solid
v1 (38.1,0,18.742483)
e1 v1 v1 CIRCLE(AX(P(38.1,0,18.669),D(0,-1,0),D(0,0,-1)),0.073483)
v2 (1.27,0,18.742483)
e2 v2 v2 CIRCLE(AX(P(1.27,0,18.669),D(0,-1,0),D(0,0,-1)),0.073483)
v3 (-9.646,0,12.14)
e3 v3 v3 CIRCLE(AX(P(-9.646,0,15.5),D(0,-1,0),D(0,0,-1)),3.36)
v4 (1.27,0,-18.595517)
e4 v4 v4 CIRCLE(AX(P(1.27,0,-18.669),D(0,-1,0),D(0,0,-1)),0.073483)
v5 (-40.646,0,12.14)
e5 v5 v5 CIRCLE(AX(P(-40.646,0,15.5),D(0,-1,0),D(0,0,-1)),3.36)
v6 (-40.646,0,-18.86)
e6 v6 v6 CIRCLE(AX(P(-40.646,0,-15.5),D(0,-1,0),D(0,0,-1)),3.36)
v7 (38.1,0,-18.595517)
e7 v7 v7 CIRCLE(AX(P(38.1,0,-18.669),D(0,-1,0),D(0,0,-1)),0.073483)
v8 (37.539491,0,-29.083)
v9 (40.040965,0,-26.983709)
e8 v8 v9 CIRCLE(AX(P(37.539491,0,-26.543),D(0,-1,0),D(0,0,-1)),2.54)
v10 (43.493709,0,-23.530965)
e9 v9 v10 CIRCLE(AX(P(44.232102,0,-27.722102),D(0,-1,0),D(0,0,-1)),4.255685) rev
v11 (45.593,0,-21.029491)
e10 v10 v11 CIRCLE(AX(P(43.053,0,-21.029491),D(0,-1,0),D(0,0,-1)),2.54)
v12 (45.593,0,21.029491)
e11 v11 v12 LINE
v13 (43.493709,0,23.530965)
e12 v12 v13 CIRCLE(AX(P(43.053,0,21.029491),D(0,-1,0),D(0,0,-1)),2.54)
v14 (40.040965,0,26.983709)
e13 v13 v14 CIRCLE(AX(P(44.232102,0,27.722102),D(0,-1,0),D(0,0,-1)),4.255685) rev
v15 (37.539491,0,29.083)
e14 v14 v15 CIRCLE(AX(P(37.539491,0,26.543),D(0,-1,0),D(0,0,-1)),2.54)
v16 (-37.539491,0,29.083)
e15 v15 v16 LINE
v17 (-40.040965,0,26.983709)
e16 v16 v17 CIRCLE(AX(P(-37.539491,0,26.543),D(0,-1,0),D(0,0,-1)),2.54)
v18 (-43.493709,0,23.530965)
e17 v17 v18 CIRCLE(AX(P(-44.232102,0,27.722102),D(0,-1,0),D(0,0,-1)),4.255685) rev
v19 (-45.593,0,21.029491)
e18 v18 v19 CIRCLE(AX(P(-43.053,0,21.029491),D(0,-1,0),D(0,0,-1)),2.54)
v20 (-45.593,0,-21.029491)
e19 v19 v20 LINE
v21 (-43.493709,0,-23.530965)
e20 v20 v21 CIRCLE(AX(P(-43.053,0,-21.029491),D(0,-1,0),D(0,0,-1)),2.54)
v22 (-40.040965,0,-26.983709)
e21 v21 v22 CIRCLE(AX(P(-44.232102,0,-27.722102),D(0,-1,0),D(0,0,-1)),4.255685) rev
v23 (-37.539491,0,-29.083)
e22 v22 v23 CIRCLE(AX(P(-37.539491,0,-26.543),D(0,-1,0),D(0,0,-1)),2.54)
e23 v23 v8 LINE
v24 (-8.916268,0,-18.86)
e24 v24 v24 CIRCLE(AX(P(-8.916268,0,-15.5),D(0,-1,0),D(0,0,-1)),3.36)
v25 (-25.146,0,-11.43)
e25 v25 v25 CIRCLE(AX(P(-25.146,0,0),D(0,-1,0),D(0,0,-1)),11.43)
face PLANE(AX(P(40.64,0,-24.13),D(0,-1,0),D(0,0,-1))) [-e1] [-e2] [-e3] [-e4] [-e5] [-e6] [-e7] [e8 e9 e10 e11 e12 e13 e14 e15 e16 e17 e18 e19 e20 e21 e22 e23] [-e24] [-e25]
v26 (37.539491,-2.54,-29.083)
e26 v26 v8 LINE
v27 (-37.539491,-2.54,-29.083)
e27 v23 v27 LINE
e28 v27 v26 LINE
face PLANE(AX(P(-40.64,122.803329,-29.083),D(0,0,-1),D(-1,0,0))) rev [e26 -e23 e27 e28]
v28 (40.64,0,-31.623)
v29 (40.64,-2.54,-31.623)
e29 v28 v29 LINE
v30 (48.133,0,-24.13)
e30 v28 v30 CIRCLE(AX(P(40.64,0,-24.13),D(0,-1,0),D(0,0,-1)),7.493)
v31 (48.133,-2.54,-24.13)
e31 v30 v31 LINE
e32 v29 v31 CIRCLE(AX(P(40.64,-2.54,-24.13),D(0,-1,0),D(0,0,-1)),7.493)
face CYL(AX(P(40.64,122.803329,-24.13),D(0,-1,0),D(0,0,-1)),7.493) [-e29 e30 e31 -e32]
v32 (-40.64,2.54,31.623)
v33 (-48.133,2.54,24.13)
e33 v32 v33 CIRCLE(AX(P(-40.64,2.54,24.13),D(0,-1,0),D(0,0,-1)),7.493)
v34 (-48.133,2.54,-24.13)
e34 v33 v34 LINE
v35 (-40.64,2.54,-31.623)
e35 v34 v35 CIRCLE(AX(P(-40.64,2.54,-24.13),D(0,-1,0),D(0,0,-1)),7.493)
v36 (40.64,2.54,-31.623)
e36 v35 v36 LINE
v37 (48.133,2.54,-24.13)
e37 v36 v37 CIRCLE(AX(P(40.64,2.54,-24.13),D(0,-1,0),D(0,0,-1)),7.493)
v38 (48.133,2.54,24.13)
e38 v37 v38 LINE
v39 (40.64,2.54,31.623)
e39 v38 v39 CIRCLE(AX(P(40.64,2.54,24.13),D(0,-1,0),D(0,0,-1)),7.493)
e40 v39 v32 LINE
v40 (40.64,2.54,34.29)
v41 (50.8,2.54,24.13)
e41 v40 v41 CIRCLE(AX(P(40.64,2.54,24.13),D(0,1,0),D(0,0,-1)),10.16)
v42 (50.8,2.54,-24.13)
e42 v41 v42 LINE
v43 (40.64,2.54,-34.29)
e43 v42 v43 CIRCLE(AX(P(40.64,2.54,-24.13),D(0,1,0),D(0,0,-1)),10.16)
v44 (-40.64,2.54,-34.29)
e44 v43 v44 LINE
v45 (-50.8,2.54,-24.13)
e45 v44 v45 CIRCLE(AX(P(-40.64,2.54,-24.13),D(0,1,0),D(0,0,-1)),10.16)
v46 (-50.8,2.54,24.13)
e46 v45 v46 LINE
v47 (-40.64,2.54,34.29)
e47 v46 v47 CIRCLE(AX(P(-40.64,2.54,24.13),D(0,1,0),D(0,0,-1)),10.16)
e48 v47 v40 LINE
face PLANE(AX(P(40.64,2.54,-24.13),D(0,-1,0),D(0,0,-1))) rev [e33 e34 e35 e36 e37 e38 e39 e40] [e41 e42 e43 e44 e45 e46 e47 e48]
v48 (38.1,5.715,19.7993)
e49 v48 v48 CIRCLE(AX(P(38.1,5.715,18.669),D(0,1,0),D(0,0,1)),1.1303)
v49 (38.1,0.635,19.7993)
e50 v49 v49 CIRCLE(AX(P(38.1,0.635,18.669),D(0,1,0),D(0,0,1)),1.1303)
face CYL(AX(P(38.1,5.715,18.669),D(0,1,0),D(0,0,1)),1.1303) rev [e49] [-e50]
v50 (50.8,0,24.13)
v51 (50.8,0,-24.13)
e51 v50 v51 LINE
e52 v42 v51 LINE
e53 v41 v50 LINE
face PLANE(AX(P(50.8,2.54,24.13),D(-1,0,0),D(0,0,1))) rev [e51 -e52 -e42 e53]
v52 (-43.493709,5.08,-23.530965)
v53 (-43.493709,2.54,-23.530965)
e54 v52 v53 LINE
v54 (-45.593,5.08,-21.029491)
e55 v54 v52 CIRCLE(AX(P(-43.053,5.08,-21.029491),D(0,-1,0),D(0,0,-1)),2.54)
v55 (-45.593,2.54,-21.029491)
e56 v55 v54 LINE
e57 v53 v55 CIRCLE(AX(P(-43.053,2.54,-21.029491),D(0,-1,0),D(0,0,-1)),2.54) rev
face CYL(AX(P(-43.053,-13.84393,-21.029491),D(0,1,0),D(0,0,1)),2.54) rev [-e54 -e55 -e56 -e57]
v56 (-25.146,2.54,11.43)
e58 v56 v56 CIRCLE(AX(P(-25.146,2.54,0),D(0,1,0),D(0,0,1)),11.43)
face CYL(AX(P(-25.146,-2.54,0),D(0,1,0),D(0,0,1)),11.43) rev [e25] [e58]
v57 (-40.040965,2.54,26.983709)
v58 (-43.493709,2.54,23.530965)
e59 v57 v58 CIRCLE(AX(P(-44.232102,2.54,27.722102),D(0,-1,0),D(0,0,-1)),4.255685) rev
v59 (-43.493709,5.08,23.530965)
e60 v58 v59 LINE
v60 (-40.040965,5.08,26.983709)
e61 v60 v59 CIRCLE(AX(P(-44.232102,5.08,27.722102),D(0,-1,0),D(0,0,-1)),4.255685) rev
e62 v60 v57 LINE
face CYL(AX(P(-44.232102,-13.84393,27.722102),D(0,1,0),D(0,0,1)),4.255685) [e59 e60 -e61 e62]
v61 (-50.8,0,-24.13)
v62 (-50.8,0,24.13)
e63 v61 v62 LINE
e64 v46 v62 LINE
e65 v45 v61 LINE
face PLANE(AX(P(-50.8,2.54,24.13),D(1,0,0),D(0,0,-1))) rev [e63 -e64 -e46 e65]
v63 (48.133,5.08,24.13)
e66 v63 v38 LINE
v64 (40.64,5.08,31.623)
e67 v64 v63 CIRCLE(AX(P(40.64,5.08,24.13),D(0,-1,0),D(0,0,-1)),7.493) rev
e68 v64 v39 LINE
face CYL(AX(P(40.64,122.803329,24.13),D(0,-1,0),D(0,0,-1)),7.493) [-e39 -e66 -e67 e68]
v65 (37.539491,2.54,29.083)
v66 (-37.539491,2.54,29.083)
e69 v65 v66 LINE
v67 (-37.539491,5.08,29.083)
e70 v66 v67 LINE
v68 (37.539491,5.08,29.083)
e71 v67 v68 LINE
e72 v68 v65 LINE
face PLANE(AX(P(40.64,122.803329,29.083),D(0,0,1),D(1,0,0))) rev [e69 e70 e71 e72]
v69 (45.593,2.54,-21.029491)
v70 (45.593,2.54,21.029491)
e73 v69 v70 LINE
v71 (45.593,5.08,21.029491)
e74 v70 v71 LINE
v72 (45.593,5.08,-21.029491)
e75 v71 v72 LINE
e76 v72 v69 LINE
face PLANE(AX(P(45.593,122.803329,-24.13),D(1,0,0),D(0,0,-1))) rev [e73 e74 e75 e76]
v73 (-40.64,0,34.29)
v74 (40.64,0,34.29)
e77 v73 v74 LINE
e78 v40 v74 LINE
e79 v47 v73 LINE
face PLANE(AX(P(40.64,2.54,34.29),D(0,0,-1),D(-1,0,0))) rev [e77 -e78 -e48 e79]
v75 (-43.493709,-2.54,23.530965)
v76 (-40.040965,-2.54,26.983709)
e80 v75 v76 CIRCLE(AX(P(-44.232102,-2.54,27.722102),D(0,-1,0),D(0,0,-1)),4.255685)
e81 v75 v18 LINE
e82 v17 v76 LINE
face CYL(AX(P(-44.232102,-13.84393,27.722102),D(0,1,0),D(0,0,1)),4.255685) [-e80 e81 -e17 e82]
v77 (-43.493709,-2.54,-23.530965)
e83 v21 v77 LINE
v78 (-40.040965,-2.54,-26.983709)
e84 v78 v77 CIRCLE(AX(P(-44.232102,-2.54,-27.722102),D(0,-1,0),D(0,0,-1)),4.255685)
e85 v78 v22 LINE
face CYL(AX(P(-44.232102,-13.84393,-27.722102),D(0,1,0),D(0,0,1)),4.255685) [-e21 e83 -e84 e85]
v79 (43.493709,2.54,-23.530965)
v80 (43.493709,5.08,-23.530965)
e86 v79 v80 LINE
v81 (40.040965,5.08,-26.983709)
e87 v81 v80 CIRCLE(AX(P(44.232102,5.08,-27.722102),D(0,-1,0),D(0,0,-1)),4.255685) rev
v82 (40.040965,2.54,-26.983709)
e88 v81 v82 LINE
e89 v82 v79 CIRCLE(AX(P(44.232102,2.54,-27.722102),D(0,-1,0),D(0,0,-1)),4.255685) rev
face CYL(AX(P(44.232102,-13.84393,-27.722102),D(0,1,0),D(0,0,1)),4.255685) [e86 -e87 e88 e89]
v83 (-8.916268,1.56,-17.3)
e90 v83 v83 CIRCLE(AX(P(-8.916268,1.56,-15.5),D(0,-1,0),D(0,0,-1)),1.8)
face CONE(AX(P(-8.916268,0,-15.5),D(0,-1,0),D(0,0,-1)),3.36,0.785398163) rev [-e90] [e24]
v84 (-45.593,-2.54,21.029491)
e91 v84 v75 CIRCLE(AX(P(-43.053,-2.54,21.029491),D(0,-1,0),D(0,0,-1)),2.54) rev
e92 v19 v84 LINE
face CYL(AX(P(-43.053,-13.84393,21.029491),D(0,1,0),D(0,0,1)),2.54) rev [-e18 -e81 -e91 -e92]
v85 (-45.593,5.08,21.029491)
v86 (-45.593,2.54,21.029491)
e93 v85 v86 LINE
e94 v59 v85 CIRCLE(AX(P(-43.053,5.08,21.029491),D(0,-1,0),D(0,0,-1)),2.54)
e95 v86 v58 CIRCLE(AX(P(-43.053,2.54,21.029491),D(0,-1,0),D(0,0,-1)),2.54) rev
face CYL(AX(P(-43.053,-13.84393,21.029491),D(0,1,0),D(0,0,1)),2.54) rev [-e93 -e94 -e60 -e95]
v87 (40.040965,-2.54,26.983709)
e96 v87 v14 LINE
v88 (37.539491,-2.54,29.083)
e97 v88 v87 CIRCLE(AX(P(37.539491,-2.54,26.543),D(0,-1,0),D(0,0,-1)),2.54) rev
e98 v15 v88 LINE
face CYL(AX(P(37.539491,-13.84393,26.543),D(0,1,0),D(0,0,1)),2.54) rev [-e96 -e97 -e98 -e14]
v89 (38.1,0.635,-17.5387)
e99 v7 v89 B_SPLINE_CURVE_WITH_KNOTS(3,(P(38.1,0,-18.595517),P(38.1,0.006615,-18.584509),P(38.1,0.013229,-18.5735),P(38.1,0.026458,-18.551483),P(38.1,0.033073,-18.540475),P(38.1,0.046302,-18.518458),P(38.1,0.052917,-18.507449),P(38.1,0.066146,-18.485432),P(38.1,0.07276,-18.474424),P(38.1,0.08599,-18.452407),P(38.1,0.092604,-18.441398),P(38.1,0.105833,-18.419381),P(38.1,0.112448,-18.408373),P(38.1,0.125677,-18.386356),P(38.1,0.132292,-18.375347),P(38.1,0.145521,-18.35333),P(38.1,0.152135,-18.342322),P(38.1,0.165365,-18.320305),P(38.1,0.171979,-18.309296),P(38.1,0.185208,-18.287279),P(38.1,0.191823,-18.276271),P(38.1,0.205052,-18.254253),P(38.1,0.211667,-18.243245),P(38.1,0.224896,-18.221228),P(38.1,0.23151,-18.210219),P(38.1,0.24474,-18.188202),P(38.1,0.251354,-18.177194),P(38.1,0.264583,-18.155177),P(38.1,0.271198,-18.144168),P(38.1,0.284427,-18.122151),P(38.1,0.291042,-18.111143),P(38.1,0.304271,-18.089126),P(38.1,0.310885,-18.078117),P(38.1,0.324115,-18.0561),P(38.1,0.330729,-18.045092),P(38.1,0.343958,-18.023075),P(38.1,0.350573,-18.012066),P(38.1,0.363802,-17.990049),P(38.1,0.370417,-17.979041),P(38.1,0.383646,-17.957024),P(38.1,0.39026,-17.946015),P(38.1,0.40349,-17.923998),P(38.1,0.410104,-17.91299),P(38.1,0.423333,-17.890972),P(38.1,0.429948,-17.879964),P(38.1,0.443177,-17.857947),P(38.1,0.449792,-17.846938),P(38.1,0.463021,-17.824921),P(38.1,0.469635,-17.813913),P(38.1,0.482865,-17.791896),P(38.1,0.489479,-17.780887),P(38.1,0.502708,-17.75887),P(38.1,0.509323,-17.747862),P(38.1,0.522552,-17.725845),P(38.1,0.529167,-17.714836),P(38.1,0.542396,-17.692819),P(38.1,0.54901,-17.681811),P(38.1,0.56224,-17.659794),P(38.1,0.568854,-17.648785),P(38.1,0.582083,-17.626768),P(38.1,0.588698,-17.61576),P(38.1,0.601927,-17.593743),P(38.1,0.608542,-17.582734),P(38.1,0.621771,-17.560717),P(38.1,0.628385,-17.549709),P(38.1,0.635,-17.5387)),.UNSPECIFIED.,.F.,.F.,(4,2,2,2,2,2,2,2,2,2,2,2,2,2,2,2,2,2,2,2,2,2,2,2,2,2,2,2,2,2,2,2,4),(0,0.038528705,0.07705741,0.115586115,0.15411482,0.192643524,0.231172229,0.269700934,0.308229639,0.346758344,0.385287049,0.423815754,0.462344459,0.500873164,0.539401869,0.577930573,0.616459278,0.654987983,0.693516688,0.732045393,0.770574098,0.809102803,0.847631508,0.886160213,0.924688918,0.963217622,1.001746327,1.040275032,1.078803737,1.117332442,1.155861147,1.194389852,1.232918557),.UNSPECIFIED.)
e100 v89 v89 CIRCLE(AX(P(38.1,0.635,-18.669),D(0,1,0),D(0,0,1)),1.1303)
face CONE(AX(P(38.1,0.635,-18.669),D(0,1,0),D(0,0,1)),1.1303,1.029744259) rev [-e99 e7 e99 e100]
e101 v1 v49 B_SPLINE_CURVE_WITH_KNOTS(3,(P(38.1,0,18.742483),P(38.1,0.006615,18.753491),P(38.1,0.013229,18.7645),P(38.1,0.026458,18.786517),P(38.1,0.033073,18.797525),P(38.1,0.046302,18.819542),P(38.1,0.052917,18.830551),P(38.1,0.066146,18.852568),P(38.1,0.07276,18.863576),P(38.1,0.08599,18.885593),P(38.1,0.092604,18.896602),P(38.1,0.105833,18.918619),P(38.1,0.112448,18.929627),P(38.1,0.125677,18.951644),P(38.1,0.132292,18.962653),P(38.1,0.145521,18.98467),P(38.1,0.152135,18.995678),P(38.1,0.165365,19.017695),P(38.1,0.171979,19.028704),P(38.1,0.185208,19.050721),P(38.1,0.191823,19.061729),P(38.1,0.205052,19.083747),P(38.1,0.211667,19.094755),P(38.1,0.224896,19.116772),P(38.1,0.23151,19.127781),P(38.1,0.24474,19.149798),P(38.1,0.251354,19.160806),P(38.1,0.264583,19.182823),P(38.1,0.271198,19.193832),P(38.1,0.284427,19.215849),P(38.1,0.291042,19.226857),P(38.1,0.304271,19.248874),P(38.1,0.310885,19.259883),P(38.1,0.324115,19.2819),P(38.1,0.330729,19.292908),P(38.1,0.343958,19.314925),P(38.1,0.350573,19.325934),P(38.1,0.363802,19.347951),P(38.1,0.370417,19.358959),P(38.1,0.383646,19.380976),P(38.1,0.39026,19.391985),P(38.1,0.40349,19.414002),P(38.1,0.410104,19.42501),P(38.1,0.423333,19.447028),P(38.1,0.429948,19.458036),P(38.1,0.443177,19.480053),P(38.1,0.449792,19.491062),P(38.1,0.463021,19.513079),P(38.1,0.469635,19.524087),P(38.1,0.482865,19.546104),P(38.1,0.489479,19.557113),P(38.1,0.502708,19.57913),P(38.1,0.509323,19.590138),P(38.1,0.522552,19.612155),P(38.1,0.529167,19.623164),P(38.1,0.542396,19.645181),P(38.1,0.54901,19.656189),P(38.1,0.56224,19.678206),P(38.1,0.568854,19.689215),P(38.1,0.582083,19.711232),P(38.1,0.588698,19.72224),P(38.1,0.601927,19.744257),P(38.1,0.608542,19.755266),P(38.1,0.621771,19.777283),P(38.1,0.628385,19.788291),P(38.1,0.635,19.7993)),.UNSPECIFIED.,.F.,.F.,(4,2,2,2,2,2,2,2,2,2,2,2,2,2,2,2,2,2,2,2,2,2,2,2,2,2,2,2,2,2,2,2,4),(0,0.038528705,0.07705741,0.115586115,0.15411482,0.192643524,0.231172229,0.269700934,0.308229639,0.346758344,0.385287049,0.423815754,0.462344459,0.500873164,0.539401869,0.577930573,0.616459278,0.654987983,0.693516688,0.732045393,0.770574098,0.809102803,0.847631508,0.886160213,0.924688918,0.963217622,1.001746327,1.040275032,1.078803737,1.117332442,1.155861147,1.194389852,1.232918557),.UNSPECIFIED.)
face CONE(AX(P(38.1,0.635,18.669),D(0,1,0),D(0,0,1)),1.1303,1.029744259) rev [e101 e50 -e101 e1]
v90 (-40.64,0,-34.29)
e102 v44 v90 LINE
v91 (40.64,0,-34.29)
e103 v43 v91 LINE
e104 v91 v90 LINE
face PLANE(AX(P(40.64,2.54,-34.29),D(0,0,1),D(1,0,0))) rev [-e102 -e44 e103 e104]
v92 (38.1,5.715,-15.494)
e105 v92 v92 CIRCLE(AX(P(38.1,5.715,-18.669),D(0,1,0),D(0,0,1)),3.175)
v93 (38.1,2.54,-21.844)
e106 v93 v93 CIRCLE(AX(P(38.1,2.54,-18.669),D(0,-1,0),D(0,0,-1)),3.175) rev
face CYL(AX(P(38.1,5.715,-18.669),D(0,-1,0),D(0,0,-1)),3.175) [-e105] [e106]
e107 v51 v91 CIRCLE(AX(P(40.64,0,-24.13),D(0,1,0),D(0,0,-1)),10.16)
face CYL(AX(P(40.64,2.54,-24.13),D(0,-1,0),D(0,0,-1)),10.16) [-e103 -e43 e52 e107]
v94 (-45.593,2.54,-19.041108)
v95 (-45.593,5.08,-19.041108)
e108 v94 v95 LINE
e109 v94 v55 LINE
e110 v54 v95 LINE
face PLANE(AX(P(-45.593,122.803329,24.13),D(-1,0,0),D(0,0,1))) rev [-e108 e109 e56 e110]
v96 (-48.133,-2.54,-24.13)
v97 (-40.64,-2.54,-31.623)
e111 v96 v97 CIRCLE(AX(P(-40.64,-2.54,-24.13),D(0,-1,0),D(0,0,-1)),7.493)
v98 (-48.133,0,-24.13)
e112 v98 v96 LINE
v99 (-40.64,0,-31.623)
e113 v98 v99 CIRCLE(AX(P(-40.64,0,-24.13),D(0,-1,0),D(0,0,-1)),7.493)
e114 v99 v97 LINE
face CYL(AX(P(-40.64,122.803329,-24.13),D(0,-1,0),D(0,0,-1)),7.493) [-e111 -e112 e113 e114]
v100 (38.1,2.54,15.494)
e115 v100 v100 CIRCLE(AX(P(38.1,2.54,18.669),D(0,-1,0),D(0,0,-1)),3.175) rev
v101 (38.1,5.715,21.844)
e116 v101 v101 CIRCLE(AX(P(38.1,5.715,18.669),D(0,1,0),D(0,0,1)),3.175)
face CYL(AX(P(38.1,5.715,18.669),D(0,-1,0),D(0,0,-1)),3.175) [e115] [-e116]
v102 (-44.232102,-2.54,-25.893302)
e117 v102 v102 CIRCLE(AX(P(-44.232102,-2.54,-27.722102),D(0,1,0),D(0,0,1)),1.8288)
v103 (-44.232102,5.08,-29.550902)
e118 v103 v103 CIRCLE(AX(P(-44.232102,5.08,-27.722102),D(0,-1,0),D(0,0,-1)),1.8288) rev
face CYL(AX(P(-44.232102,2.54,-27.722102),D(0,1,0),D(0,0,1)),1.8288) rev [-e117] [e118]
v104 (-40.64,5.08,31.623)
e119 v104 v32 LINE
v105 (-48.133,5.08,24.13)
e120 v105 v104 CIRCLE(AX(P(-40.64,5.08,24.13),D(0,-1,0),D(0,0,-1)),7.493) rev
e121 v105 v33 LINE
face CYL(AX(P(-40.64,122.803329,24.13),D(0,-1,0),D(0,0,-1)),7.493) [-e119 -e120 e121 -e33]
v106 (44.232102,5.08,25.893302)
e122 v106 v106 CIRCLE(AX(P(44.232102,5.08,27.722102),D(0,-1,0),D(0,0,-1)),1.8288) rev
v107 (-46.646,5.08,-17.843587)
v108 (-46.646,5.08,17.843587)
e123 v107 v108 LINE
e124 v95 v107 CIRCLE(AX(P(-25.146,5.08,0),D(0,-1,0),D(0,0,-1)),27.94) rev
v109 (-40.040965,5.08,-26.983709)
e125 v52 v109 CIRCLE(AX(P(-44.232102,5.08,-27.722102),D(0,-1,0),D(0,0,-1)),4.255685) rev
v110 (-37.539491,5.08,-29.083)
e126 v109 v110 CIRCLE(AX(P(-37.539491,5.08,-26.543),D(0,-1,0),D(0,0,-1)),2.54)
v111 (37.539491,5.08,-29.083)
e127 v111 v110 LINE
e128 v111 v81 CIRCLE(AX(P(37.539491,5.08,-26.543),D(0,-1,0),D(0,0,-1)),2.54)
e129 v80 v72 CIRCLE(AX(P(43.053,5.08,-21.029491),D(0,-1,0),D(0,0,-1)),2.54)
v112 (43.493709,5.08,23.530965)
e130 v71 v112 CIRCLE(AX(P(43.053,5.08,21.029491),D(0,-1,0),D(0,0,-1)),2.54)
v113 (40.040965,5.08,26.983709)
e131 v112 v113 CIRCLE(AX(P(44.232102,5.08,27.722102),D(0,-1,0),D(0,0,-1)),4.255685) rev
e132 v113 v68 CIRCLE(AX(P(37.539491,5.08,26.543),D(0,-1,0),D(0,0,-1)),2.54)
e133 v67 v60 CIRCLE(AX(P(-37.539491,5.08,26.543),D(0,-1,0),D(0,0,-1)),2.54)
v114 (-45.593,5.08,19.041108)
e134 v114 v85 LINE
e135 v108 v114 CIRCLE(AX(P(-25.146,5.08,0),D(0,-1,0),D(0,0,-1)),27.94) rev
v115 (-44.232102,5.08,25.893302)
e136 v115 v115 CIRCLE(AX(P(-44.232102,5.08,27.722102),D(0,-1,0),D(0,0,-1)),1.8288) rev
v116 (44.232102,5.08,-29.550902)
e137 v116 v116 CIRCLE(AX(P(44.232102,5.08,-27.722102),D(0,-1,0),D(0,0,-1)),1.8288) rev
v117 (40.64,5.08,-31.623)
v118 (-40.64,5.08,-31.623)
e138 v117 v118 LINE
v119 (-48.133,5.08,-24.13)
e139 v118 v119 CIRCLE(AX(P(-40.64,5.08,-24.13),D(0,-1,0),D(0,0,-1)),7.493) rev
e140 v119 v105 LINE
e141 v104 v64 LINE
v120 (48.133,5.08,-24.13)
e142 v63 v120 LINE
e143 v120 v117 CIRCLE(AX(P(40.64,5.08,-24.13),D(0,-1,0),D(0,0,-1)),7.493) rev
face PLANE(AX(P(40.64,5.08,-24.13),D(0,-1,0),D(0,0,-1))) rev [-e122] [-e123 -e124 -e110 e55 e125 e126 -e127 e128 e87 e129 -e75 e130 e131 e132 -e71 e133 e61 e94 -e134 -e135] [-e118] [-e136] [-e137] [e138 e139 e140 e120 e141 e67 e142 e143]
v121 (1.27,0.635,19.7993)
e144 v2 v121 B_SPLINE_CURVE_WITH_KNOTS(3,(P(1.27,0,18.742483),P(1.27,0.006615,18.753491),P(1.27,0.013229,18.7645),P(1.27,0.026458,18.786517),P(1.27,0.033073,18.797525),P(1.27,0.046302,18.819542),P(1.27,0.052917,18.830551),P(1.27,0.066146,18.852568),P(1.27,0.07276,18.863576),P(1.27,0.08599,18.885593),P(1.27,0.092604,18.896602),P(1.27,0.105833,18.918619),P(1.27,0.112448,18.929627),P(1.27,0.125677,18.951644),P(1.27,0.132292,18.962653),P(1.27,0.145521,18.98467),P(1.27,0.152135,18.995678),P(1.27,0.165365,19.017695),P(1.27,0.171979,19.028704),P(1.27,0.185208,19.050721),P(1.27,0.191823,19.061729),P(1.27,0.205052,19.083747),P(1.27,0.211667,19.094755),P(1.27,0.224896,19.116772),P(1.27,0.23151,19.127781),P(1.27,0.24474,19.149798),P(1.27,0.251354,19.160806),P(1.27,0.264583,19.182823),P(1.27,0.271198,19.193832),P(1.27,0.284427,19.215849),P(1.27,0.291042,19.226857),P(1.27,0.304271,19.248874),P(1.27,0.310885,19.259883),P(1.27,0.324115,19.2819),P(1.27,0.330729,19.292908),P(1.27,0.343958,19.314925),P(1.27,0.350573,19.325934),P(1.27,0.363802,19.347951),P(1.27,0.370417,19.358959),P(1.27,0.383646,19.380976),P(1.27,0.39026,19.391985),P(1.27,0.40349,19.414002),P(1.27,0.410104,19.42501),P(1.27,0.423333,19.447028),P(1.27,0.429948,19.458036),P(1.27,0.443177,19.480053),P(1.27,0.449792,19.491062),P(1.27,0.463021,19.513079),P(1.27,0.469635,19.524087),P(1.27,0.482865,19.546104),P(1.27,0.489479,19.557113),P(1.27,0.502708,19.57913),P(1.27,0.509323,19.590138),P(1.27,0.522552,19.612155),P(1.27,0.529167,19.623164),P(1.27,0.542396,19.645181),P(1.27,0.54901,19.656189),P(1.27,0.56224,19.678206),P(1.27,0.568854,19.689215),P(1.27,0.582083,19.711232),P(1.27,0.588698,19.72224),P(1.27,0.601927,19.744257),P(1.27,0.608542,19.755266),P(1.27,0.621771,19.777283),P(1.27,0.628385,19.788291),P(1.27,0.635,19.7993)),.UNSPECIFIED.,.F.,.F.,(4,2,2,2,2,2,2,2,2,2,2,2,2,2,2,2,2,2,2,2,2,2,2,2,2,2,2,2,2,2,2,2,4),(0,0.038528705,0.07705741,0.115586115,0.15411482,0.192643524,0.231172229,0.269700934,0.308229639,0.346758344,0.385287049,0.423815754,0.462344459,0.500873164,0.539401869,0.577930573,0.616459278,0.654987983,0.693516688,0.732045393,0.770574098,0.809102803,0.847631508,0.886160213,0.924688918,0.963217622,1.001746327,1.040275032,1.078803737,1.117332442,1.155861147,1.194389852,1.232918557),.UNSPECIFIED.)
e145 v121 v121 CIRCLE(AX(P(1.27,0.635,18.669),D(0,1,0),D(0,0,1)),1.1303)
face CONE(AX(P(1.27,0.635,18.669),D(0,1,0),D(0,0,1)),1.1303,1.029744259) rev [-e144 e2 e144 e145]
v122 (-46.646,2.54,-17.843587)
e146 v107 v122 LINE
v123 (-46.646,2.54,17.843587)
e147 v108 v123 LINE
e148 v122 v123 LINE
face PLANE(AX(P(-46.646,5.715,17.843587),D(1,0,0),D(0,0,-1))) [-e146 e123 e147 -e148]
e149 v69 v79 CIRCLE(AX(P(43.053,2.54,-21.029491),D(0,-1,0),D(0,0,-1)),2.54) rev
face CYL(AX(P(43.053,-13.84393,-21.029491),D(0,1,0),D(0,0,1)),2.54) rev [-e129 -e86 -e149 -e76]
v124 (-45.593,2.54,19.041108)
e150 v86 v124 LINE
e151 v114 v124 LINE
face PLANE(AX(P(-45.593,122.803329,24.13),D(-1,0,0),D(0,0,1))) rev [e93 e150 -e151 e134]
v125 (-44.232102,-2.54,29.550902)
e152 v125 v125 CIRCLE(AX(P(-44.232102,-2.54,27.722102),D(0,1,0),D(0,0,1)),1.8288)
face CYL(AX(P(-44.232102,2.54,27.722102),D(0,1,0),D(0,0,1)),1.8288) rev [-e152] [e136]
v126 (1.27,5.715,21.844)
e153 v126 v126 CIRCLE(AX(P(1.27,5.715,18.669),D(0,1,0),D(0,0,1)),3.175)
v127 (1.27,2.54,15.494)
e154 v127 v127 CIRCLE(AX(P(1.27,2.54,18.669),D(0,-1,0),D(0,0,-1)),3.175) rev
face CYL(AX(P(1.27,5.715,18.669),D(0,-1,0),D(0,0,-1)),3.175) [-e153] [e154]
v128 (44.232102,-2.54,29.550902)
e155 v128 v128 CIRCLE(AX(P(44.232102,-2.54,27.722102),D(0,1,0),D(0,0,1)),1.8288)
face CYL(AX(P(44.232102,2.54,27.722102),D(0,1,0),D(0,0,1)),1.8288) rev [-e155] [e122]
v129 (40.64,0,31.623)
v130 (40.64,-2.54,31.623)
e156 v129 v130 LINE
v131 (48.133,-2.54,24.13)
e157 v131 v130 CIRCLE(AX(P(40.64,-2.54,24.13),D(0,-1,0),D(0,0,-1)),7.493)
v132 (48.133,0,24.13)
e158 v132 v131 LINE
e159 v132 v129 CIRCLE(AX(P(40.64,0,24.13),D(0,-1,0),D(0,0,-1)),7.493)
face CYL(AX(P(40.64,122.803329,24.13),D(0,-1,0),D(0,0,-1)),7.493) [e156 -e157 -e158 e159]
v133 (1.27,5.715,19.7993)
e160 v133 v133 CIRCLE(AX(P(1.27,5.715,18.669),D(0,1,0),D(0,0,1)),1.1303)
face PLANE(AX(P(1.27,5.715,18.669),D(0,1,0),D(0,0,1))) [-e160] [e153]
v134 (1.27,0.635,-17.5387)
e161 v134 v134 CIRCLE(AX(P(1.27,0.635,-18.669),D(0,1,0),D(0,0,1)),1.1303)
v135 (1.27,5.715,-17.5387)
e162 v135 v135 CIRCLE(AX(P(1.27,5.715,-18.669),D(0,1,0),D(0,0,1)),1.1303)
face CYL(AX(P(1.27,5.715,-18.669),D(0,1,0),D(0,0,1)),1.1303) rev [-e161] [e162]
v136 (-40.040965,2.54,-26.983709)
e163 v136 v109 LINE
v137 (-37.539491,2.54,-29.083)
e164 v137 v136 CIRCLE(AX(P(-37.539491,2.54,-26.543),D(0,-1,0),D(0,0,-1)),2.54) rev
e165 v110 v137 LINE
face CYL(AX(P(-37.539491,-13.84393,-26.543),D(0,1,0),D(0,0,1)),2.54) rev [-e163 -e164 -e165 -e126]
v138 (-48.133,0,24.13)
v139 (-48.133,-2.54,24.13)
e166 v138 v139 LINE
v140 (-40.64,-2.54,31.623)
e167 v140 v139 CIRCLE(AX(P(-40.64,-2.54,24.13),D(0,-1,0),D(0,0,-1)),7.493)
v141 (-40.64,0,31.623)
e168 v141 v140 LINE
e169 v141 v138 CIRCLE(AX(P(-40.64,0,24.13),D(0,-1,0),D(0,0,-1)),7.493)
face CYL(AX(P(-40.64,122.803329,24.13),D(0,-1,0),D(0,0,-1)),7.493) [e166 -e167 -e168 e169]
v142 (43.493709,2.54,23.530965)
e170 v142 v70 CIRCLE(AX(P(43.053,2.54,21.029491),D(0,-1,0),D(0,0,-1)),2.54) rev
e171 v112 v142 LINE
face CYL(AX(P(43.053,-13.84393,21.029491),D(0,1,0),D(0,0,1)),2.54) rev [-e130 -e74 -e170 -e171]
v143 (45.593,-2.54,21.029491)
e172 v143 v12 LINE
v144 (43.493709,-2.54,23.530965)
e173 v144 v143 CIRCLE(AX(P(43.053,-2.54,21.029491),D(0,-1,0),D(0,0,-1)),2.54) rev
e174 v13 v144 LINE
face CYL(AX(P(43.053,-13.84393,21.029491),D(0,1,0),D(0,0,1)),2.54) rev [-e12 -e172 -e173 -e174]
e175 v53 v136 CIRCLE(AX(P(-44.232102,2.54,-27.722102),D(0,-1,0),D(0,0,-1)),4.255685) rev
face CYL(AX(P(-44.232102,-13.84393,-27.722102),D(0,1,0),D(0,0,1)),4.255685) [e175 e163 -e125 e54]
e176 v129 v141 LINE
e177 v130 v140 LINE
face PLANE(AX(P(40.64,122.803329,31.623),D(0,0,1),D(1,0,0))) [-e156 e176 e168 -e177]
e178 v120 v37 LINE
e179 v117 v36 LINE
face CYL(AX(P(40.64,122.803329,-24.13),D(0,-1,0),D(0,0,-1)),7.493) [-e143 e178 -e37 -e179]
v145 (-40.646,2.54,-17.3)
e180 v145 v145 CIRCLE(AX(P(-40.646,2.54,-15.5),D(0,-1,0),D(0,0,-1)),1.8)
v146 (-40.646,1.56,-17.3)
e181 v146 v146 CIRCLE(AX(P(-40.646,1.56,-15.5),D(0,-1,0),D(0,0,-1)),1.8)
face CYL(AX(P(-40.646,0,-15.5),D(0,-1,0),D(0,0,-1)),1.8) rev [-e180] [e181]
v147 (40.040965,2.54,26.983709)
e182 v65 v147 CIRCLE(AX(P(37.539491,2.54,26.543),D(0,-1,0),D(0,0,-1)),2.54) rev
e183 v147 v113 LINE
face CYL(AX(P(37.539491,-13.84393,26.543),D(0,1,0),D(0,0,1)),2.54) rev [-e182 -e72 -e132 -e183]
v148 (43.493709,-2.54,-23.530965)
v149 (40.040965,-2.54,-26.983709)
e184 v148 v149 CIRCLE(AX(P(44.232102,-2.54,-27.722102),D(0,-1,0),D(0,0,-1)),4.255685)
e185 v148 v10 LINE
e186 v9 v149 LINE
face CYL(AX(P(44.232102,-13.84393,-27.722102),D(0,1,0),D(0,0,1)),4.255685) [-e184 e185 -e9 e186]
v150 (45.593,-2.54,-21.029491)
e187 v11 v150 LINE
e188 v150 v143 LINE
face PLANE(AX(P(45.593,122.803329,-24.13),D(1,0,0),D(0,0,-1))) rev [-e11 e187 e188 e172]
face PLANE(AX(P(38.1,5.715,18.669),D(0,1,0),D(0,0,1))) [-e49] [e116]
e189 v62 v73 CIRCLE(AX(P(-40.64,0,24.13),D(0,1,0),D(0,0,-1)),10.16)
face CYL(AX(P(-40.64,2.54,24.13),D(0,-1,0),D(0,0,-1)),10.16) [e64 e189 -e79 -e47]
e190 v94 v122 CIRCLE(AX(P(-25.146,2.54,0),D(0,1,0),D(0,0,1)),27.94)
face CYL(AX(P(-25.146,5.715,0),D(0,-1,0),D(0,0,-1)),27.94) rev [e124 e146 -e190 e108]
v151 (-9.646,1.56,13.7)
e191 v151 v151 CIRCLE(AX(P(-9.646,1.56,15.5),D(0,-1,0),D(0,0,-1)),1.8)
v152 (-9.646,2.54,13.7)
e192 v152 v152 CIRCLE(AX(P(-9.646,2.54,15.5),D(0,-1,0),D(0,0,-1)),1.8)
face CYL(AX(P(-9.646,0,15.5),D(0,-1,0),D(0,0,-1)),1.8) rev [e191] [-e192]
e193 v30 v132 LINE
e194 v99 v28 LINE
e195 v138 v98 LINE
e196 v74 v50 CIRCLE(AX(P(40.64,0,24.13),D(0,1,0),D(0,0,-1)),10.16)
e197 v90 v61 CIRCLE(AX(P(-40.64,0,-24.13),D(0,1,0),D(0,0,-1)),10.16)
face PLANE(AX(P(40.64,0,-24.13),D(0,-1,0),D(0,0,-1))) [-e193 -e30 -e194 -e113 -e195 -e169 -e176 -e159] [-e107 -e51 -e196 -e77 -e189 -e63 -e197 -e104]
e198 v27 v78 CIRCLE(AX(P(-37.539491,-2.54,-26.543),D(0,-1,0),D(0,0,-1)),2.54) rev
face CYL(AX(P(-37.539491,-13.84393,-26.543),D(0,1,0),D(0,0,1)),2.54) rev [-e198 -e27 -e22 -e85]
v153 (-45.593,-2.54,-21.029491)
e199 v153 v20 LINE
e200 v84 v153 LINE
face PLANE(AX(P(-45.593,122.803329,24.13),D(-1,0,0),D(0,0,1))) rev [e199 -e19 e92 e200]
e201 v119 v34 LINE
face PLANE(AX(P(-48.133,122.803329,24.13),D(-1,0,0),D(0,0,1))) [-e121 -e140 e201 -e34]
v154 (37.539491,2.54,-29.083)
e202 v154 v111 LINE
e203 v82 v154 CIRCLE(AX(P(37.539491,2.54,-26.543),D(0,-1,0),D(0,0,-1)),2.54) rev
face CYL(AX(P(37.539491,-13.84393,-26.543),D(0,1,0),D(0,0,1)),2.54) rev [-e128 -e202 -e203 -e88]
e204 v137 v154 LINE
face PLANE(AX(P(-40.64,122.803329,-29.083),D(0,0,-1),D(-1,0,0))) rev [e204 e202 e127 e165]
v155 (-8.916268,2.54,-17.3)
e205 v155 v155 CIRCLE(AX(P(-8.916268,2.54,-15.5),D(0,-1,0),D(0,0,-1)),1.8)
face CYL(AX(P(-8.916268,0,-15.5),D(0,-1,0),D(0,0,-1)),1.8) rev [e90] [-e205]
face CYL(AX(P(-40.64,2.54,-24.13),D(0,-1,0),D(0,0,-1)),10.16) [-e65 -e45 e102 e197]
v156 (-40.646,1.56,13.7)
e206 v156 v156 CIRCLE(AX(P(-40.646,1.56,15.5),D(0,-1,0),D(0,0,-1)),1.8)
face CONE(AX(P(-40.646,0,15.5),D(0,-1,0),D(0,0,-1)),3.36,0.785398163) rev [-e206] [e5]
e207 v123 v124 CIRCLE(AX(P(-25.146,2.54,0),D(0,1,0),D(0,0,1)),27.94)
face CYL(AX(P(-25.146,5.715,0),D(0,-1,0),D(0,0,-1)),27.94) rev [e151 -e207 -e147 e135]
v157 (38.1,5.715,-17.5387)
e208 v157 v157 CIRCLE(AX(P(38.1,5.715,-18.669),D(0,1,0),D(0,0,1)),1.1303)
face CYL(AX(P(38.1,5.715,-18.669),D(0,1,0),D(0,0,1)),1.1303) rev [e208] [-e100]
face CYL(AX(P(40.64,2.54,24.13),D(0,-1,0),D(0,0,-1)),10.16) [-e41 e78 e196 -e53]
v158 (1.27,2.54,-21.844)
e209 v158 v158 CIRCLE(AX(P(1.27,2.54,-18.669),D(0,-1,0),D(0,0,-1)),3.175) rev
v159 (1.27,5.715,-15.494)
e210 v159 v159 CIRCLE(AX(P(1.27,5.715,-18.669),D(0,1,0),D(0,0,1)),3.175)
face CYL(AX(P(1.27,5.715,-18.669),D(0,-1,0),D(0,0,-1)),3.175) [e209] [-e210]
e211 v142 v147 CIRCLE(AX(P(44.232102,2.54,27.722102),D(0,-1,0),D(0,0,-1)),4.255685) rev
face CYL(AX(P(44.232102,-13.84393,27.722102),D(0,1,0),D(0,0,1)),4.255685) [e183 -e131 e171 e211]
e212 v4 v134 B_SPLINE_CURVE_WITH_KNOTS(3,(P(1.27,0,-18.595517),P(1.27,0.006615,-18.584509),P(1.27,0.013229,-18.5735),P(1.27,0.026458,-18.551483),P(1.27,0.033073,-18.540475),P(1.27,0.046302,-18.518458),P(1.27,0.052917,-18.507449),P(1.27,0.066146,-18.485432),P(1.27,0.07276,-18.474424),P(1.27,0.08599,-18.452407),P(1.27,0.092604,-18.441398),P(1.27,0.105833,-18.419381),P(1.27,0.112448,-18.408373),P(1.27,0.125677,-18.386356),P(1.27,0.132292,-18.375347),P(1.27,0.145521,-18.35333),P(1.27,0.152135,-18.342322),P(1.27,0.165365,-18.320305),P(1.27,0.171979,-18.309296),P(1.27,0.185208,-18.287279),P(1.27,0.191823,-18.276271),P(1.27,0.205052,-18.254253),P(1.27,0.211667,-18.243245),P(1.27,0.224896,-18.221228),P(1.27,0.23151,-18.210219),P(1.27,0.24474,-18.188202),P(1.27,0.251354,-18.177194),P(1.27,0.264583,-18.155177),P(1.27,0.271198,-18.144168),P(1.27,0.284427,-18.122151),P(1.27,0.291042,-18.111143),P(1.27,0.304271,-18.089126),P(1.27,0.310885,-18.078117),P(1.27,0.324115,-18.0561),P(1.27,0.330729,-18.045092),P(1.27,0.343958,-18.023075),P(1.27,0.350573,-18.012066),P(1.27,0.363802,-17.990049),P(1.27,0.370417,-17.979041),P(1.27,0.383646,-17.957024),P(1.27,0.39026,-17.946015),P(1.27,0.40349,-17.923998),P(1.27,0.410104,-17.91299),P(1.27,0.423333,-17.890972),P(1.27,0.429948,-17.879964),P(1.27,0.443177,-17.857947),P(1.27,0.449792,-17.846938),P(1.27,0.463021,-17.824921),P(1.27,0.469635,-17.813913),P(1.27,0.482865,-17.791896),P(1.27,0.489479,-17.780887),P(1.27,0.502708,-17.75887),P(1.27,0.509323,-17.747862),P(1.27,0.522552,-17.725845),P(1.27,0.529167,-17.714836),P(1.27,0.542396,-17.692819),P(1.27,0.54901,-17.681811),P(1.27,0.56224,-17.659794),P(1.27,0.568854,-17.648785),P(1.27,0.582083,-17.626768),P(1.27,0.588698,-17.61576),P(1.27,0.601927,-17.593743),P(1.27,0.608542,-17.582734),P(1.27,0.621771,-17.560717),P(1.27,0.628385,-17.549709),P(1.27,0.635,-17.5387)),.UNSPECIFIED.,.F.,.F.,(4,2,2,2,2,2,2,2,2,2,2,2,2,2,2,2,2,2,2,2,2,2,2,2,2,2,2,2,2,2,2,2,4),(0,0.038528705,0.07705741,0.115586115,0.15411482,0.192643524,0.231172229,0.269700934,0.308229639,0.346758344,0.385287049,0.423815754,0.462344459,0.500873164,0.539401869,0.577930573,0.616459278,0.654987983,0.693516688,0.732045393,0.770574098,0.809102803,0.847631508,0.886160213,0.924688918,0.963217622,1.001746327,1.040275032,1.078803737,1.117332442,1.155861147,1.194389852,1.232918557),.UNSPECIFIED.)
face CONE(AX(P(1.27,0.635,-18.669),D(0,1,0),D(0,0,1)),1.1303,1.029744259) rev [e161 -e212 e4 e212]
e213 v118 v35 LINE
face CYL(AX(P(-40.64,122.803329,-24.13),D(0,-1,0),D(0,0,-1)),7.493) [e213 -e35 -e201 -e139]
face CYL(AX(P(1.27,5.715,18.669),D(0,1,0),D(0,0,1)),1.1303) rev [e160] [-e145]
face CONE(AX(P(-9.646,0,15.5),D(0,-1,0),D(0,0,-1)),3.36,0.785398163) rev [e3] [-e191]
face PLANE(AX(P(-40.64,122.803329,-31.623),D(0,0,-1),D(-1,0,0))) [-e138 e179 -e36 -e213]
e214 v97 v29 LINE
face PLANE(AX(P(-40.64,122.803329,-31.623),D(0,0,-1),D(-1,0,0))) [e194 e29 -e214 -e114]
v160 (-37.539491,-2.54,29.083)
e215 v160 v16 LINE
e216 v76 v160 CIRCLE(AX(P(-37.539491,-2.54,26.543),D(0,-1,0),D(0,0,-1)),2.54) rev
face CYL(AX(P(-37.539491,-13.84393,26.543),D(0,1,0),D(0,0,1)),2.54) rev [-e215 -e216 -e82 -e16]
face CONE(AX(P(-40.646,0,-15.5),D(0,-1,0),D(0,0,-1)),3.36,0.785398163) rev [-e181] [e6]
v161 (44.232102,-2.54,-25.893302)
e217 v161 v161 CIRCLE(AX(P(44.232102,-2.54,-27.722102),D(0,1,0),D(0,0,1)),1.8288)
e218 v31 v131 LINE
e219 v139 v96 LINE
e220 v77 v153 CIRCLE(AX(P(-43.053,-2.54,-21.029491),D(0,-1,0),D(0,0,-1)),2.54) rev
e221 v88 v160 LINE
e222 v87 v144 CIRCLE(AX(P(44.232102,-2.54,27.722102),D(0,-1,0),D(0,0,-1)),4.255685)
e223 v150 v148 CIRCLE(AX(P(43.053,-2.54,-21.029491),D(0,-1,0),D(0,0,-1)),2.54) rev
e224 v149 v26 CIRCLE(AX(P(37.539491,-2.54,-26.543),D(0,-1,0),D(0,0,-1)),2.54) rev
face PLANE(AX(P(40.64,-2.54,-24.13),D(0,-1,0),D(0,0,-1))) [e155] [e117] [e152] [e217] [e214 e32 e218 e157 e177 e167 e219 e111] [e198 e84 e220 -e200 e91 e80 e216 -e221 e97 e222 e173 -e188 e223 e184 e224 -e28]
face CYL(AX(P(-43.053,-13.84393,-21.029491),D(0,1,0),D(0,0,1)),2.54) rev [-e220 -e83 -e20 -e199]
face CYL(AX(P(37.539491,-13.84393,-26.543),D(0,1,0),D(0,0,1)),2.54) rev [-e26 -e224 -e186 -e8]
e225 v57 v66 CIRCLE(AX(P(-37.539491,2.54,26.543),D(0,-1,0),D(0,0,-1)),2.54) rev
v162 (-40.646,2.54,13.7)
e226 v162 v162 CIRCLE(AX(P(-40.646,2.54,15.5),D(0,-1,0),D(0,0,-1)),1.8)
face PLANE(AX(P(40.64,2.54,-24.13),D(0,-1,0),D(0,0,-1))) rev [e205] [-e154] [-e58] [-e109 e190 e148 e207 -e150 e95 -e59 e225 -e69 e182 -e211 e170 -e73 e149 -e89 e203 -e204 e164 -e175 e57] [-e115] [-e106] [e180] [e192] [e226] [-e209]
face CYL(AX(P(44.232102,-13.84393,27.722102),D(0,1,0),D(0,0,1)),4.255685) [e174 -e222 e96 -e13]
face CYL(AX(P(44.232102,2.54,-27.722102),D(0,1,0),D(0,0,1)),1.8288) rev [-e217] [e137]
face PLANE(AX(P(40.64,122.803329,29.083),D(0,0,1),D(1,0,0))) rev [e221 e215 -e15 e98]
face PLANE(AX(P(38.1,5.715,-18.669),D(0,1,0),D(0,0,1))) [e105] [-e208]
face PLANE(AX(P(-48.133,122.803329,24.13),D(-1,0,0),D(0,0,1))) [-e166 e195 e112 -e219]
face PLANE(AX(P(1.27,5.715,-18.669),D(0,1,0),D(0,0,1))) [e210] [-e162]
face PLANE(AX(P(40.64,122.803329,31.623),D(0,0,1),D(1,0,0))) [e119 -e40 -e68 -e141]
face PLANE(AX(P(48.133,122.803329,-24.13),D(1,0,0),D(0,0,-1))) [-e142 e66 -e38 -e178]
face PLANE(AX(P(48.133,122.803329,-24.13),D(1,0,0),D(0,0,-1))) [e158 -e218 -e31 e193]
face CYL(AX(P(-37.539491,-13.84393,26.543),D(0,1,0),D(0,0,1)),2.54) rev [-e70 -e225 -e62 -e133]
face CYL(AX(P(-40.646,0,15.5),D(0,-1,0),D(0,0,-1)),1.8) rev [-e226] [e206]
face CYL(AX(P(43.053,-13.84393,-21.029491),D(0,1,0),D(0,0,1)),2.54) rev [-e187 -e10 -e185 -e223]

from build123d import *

# Parameters (mm, degrees)
BOSS_EXTRUDE1_DEPTH           = 2.54
BOSS_EXTRUDE2_DEPTH           = 2.54
BOSS_EXTRUDE2_DEPTH_BACK      = 5.08
HOLE1_OUTLINE_R               = 11.43
HOLE1_DEPTH                   = 2.54
CSK_FOR_M3_SFHCS1_D           = 3.6
CSK_FOR_M3_SFHCS1_CSINK_D     = 6.72
CSK_FOR_M3_SFHCS1_CSINK_ANGLE = 90
SKETCH9_W                     = 1.8288
SKETCH9_H                     = 5.08
F_6_CLEARANCE_HOLE_AT_2_COUNT = 2
F_6_CLEARANCE_HOLE_AT_2_PITCH = 55.444204897
F_6_CLEARANCE_HOLE_AT_3_COUNT = 2
F_6_CLEARANCE_HOLE_AT_3_PITCH = 104.402947299
F_6_CLEARANCE_HOLE_AT_4_COUNT = 2
F_6_CLEARANCE_HOLE_AT_4_PITCH = 88.464204897
BOSS_EXTRUDE4_START           = -5.08
SKETCH10_R                    = 1.8288
BOSS_EXTRUDE4_DEPTH           = 7.62
FILLET4_R                     = 2.54
SKETCH11_R                    = 3.175
BOSS_EXTRUDE5_DEPTH           = 3.175
TAP_DRILL_FOR_4_40_TAP1_D     = 2.2606
TAP_DRILL_FOR_4_40_TAP1_DEPTH = 5.08
TAP_DRILL_FOR_4_40_TAP1_TIP   = 0.679152758
SKETCH14_R                    = 1.8288
CUT_EXTRUDE1_DEPTH            = 62.843262568
CUT_EXTRUDE2_DEPTH            = 62.500004065


# Read off the part's stored shape, not the designer's step: Hole1
with BuildPart() as part:
    # Sketch1 → Boss-Extrude1 (new body)
    with BuildSketch(Plane(origin=(0, 0, 0), x_dir=(1, 0, 0), z_dir=(0, 1, 0))):
        with BuildLine():
            Line((40.64, -34.29), (-40.64, -34.29))
            ThreePointArc((-40.64, -34.29), (-47.824204897, -31.314204897), (-50.8, -24.13))
            Line((-50.8, -24.13), (-50.8, 24.13))
            ThreePointArc((-50.8, 24.13), (-47.824204897, 31.314204897), (-40.64, 34.29))
            Line((-40.64, 34.29), (40.64, 34.29))
            ThreePointArc((40.64, 34.29), (47.824204897, 31.314204897), (50.8, 24.13))
            Line((50.8, 24.13), (50.8, -24.13))
            ThreePointArc((50.8, -24.13), (47.824204897, -31.314204897), (40.64, -34.29))
        make_face()
    extrude(amount=BOSS_EXTRUDE1_DEPTH)

    # Sketch2 → Boss-Extrude2 (add, two sides: drawn at the far end of the back side and taken through both)
    with BuildSketch(Plane.XZ.offset(-BOSS_EXTRUDE2_DEPTH_BACK)):
        with BuildLine():
            Line((48.133, -24.13), (48.133, 24.13))
            ThreePointArc((48.133, 24.13), (45.938351111, 29.428351111), (40.64, 31.623))
            Line((40.64, 31.623), (-40.64, 31.623))
            ThreePointArc((-40.64, 31.623), (-45.938351111, 29.428351111), (-48.133, 24.13))
            Line((-48.133, 24.13), (-48.133, -24.13))
            ThreePointArc((-48.133, -24.13), (-45.938351111, -29.428351111), (-40.64, -31.623))
            Line((-40.64, -31.623), (40.64, -31.623))
            ThreePointArc((40.64, -31.623), (45.938351111, -29.428351111), (48.133, -24.13))
        make_face()
        with BuildLine():
            Line((45.593, -24.13), (45.593, 24.13))
            ThreePointArc((45.593, 24.13), (44.142299887, 27.632299887), (40.64, 29.083))
            Line((40.64, 29.083), (-40.64, 29.083))
            ThreePointArc((-40.64, 29.083), (-44.142299887, 27.632299887), (-45.593, 24.13))
            Line((-45.593, 24.13), (-45.593, -24.13))
            ThreePointArc((-45.593, -24.13), (-44.142299887, -27.632299887), (-40.64, -29.083))
            Line((-40.64, -29.083), (40.64, -29.083))
            ThreePointArc((40.64, -29.083), (44.142299887, -27.632299887), (45.593, -24.13))
        make_face(mode=Mode.SUBTRACT)
    extrude(amount=BOSS_EXTRUDE2_DEPTH + BOSS_EXTRUDE2_DEPTH_BACK)

    # Hole1 outline → Hole1 (cut)
    with BuildSketch(Plane(origin=(0, 0, 0), x_dir=(1, 0, 0), z_dir=(0, 1, 0))):
        with Locations((-25.146, 0)):
            Circle(HOLE1_OUTLINE_R)
    extrude(amount=HOLE1_DEPTH, mode=Mode.SUBTRACT)

    # CSK for M3 SFHCS1 (through all)
    with Locations(Plane(origin=(48.934573601, 0, -16.825198342), x_dir=(0, 0, 1), z_dir=(0, -1, 0))):
        with Locations((32.325198342, 89.580573601), (1.325198342, 89.580573601), (1.325198342, 57.850841183), (32.325198342, 58.580573601)):
            CounterSinkHole(CSK_FOR_M3_SFHCS1_D / 2, CSK_FOR_M3_SFHCS1_CSINK_D / 2, counter_sink_angle=CSK_FOR_M3_SFHCS1_CSINK_ANGLE)

    # Sketch9 → #6 Clearance Hole (revolve, cut)
    with BuildSketch(Plane(origin=(44.232102448, 2.54, -27.722102448), x_dir=(0, 0, 1), z_dir=(1, 0, 0))):
        with Locations((0.9144, 2.54)):
            Rectangle(SKETCH9_W, SKETCH9_H)
    f_6_clearance_hole = revolve(axis=Axis((44.232102448, 8.89, -27.722102448), (0, -1, 0)), mode=Mode.SUBTRACT)

    # #6 Clearance Hole at 2: #6 Clearance Hole ×2
    with Locations(*[(0, 0, i * F_6_CLEARANCE_HOLE_AT_2_PITCH) for i in range(1, F_6_CLEARANCE_HOLE_AT_2_COUNT)]):
        add(f_6_clearance_hole, mode=Mode.SUBTRACT)

    # #6 Clearance Hole at 3: #6 Clearance Hole ×2
    with Locations(*[Vector(-0.8473343634990179, 0, 0.5310597672896286) * (i * F_6_CLEARANCE_HOLE_AT_3_PITCH) for i in range(1, F_6_CLEARANCE_HOLE_AT_3_COUNT)]):
        add(f_6_clearance_hole, mode=Mode.SUBTRACT)

    # #6 Clearance Hole at 4: #6 Clearance Hole ×2
    with Locations(*[(-i * F_6_CLEARANCE_HOLE_AT_4_PITCH, 0, 0) for i in range(1, F_6_CLEARANCE_HOLE_AT_4_COUNT)]):
        add(f_6_clearance_hole, mode=Mode.SUBTRACT)

    # Sketch10 → Boss-Extrude4 (add)
    # profile 1 of 4: a face of its own
    with BuildSketch(Plane.XZ.offset(BOSS_EXTRUDE4_START)):
        with BuildLine():
            ThreePointArc((-42.196740764, 31.45950252), (-45.938351111, 29.428351111), (-47.96950252, 25.686740764))
            ThreePointArc((-47.96950252, 25.686740764), (-41.222878588, 24.712878588), (-42.196740764, 31.45950252))
        make_face()
        with Locations(Location((-44.232102448, 27.722102448, 0), (0, 0, 90))):
            Circle(SKETCH10_R, mode=Mode.SUBTRACT)
    # profile 2 of 4: a face of its own
    with BuildSketch(Plane.XZ.offset(BOSS_EXTRUDE4_START)):
        with BuildLine():
            ThreePointArc((47.96950252, 25.686740764), (41.222878588, 24.712878588), (42.196740764, 31.45950252))
            ThreePointArc((42.196740764, 31.45950252), (45.938351111, 29.428351111), (47.96950252, 25.686740764))
        make_face()
        with Locations(Location((44.232102448, 27.722102448, 0), (0, 0, 90))):
            Circle(SKETCH10_R, mode=Mode.SUBTRACT)
    # profile 3 of 4: a face of its own
    with BuildSketch(Plane.XZ.offset(BOSS_EXTRUDE4_START)):
        with BuildLine():
            ThreePointArc((42.196740764, -31.45950252), (45.938351111, -29.428351111), (47.96950252, -25.686740764))
            ThreePointArc((47.96950252, -25.686740764), (41.222878588, -24.712878588), (42.196740764, -31.45950252))
        make_face()
        with Locations(Location((44.232102448, -27.722102448, 0), (0, 0, 90))):
            Circle(SKETCH10_R, mode=Mode.SUBTRACT)
    # profile 4 of 4: a face of its own
    with BuildSketch(Plane.XZ.offset(BOSS_EXTRUDE4_START)):
        with BuildLine():
            ThreePointArc((-47.96950252, -25.686740764), (-41.222878588, -24.712878588), (-42.196740764, -31.45950252))
            ThreePointArc((-42.196740764, -31.45950252), (-45.938351111, -29.428351111), (-47.96950252, -25.686740764))
        make_face()
        with Locations(Location((-44.232102448, -27.722102448, 0), (0, 0, 90))):
            Circle(SKETCH10_R, mode=Mode.SUBTRACT)
    extrude(amount=BOSS_EXTRUDE4_DEPTH)

    # Fillet4
    fillet4_edges = [part.edges().sort_by_distance(p)[0] for p in [
        (-40.199880439, 3.81, 29.083),
        (-45.593, 3.81, 23.689880439),
        (-45.593, -1.27, 23.689880439),
        (-40.199880439, -1.27, 29.083),
        (40.199880439, -1.27, 29.083),
        (45.593, -1.27, 23.689880439),
        (40.199880439, 3.81, 29.083),
        (45.593, 3.81, 23.689880439),
        (45.593, -1.27, -23.689880439),
        (40.199880439, -1.27, -29.083),
        (45.593, 3.81, -23.689880439),
        (40.199880439, 3.81, -29.083),
        (-40.199880439, -1.27, -29.083),
        (-45.593, -1.27, -23.689880439),
        (-40.199880439, 3.81, -29.083),
        (-45.593, 3.81, -23.689880439),
    ]]
    fillet(fillet4_edges, radius=FILLET4_R)

    # Sketch11 → Boss-Extrude5 (add)
    with BuildSketch(Plane(origin=(0, 2.54, 0), x_dir=(1, 0, 0), z_dir=(0, 1, 0))):
        with Locations(Location((38.1, 18.669, 0), (0, 0, 90))):
            Circle(SKETCH11_R)
        with Locations(Location((1.27, 18.669, 0), (0, 0, 90))):
            Circle(SKETCH11_R)
        with Locations(Location((1.27, -18.669, 0), (0, 0, 90))):
            Circle(SKETCH11_R)
        with Locations(Location((38.1, -18.669, 0), (0, 0, 90))):
            Circle(SKETCH11_R)
    extrude(amount=BOSS_EXTRUDE5_DEPTH)

    # Tap Drill for #4-40 Tap1
    with Locations(Plane(origin=(0, 5.715, 0), x_dir=(1, 0, 0), z_dir=(0, 1, 0))):
        with Locations((38.1, 18.669), (1.27, 18.669), (1.27, -18.669), (38.1, -18.669)):
            Hole(TAP_DRILL_FOR_4_40_TAP1_D / 2, depth=TAP_DRILL_FOR_4_40_TAP1_DEPTH)
            with Locations((0, 0, -(TAP_DRILL_FOR_4_40_TAP1_DEPTH + TAP_DRILL_FOR_4_40_TAP1_TIP / 2))):  # 118° drill point
                Cone(0, TAP_DRILL_FOR_4_40_TAP1_D / 2, TAP_DRILL_FOR_4_40_TAP1_TIP, mode=Mode.SUBTRACT)

    # Sketch14 → Cut-Extrude1 (cut, through all)
    with BuildSketch(Plane.XZ.offset(2.54)):
        with Locations(Location((44.232102448, -27.722102448, 0), (0, 0, 90))):
            Circle(SKETCH14_R)
        with Locations(Location((-44.232102448, -27.722102448, 0), (0, 0, 90))):
            Circle(SKETCH14_R)
        with Locations(Location((-44.232102448, 27.722102448, 0), (0, 0, 90))):
            Circle(SKETCH14_R)
        with Locations(Location((44.232102448, 27.722102448, 0), (0, 0, 90))):
            Circle(SKETCH14_R)
    extrude(amount=-CUT_EXTRUDE1_DEPTH, mode=Mode.SUBTRACT)

    # Sketch15 → Cut-Extrude2 (cut, through all)
    with BuildSketch(Plane(origin=(0, 2.54, 0), x_dir=(1, 0, 0), z_dir=(0, 1, 0))):
        with BuildLine():
            Line((-42.989587083, -21.5), (-7.302412917, -21.5))
            ThreePointArc((-7.302412917, -21.5), (-5.389436534, -19.756563466), (-3.646, -17.843587083))
            Line((-3.646, -17.843587083), (-3.646, 17.843587083))
            ThreePointArc((-3.646, 17.843587083), (-5.389436534, 19.756563466), (-7.302412917, 21.5))
            Line((-7.302412917, 21.5), (-42.989587083, 21.5))
            ThreePointArc((-42.989587083, 21.5), (-44.902563466, 19.756563466), (-46.646, 17.843587083))
            Line((-46.646, 17.843587083), (-46.646, -17.843587083))
            ThreePointArc((-46.646, -17.843587083), (-44.902563466, -19.756563466), (-42.989587083, -21.5))
        make_face()
    extrude(amount=CUT_EXTRUDE2_DEPTH, mode=Mode.SUBTRACT)


solid = part.part
